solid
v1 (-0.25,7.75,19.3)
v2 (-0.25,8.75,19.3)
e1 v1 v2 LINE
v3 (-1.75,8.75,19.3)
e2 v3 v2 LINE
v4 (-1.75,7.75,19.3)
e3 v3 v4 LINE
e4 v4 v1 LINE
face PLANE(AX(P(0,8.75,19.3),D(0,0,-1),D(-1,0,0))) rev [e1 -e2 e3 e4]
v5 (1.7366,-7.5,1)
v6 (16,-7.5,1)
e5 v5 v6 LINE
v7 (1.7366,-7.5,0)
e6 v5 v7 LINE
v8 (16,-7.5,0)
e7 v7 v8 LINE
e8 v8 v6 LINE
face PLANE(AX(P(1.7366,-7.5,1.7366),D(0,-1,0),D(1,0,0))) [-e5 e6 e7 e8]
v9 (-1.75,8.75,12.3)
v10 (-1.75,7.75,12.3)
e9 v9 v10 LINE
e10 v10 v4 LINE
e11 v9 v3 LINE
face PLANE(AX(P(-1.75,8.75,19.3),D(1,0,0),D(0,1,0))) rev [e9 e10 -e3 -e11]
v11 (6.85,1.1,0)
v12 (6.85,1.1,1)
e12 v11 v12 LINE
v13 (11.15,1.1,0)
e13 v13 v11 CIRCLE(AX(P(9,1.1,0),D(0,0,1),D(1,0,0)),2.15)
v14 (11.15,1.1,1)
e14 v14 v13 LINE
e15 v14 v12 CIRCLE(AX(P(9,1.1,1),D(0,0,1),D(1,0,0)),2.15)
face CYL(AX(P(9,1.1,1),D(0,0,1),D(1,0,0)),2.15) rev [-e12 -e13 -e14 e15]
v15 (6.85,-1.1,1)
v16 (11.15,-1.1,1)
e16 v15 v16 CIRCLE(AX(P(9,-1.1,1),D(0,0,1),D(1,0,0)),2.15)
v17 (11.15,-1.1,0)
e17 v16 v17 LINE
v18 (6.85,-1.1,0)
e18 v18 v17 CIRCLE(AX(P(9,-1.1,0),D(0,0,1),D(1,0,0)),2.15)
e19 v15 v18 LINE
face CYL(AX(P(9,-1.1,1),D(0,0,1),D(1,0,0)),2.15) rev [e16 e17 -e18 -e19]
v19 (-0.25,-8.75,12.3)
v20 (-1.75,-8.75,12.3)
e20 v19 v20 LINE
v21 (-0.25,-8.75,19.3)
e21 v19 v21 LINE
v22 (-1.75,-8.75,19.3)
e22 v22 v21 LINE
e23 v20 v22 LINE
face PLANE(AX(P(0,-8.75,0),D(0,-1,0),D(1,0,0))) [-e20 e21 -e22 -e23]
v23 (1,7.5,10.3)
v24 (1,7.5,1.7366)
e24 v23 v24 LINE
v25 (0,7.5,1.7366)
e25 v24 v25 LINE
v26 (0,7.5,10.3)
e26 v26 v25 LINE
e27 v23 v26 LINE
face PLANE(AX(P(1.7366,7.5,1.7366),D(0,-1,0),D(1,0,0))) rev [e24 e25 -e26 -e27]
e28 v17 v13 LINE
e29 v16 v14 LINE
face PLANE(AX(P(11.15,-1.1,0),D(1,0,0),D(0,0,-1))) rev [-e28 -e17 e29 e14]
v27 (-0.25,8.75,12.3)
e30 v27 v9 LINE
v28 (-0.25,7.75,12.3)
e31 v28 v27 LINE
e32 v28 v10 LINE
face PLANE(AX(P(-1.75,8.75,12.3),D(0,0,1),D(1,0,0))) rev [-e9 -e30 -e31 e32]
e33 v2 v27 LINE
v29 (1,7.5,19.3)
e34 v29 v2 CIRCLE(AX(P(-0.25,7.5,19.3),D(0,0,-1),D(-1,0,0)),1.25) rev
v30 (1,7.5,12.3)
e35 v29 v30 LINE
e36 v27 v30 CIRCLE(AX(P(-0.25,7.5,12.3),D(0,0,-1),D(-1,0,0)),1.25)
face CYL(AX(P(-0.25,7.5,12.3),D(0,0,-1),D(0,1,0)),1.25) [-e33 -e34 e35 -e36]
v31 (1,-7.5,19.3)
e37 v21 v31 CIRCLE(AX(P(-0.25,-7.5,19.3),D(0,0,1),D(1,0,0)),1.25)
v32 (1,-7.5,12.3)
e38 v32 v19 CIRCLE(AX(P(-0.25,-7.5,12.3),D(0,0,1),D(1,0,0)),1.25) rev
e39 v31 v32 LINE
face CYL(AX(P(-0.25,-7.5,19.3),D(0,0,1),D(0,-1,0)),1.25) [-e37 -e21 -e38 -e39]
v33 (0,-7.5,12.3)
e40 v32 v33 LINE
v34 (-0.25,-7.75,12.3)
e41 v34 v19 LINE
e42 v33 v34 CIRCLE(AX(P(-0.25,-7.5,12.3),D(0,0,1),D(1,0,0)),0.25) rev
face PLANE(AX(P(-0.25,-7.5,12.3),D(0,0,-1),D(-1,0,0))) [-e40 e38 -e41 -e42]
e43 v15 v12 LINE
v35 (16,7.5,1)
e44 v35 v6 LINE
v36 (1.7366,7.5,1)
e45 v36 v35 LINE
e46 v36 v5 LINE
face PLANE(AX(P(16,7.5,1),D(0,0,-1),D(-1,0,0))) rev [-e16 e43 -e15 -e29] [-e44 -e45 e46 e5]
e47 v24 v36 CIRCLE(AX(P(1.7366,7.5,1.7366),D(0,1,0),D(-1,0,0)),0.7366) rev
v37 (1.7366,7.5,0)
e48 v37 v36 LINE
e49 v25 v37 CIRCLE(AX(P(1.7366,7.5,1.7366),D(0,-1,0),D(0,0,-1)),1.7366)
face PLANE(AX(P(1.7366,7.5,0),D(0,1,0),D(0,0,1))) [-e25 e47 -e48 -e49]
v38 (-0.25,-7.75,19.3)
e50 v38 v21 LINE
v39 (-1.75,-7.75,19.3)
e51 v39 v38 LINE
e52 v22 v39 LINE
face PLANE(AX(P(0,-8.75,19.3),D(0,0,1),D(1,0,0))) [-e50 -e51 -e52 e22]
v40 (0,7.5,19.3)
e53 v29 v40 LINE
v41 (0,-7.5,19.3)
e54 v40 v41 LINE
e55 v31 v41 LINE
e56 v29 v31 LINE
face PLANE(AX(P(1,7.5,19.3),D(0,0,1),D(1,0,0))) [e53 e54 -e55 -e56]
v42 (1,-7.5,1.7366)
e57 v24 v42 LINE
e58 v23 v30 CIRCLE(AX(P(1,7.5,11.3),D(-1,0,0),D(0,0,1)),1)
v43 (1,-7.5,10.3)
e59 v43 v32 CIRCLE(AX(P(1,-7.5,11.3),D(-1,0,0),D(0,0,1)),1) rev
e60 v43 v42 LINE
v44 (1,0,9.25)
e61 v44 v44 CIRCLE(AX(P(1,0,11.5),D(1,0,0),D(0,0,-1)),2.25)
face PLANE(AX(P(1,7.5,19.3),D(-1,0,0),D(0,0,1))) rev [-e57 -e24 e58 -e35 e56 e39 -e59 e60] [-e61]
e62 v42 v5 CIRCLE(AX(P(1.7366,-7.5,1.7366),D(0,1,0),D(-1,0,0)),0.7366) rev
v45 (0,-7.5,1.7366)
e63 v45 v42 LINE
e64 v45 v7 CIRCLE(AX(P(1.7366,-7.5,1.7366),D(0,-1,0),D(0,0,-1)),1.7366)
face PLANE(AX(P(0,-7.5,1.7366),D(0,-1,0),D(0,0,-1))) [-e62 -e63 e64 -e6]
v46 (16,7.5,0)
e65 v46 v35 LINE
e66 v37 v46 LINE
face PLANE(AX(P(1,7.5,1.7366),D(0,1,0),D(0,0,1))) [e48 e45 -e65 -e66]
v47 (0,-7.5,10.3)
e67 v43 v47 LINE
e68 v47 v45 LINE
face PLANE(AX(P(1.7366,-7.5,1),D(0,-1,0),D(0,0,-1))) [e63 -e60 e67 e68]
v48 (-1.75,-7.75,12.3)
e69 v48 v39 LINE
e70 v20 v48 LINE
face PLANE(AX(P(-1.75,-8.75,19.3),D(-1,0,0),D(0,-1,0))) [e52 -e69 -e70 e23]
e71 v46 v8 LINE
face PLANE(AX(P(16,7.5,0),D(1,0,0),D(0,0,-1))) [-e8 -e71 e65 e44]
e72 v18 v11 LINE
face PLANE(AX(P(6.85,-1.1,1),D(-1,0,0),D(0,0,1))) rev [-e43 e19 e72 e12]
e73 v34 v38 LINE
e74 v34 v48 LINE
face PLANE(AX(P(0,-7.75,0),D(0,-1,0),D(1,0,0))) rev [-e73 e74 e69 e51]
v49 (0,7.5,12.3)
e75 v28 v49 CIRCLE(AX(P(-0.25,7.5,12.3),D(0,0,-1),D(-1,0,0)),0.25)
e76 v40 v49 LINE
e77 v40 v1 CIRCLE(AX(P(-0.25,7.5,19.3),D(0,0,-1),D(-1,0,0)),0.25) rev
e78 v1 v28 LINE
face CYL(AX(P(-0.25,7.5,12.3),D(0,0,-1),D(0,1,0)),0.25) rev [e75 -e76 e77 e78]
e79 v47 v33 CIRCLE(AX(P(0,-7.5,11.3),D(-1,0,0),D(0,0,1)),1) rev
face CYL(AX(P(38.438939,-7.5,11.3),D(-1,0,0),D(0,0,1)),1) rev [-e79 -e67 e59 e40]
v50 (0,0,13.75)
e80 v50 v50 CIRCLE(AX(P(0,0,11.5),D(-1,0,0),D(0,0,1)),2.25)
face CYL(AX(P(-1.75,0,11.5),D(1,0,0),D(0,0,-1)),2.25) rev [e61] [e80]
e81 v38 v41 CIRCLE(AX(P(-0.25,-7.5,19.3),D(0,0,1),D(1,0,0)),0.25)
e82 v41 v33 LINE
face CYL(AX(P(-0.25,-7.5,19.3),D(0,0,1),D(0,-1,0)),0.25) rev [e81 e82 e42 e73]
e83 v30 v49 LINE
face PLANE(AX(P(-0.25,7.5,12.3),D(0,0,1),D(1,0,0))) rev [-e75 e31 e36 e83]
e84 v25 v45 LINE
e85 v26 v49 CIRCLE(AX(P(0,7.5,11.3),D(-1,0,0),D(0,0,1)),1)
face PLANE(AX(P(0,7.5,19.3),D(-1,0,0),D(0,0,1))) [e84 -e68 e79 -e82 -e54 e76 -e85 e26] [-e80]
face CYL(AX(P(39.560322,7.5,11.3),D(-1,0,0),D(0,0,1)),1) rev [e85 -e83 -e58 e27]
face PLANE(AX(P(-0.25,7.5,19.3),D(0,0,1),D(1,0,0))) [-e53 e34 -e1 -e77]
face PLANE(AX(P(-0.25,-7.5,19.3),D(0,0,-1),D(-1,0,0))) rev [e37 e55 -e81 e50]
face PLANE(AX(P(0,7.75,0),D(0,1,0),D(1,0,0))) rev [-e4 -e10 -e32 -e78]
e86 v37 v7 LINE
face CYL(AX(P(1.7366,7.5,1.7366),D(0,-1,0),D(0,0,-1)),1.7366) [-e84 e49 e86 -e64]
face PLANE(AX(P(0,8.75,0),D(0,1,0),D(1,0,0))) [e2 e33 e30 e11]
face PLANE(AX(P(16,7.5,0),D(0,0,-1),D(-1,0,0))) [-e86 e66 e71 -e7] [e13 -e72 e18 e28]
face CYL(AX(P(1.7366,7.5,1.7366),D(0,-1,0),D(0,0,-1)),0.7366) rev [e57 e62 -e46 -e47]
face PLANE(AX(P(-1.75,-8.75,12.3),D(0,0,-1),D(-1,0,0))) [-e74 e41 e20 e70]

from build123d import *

# Parameters (mm, degrees)
BASE_FLANGE_DEPTH        = 7.5
NOTCH_CUT_DEPTH          = 26.568339797
EDGE_FLANGE1_DEPTH       = 7
M4_CLEARANCE_SLOT1_DEPTH = 1
HOLE1_OUTLINE_R          = 2.25
HOLE1_DEPTH              = 1


# Read off the part's stored shape, not the designer's step: M4 Clearance Slot1, Hole1
# Sheet-metal steps are written as plain solids
with BuildPart() as part:
    # Profile Sketch → Base Flange (new, symmetric)
    with BuildSketch(Plane(origin=(171.772586935, 0, 3.13889728), x_dir=(-1, 0, 0), z_dir=(0, 1, 0))):
        with BuildLine():
            Line((155.772586935, -3.13889728), (170.035986935, -3.13889728))
            ThreePointArc((170.035986935, -3.13889728), (171.263948571, -2.630258916), (171.772586935, -1.40229728))
            Line((171.772586935, -1.40229728), (171.772586935, 16.16110272))
            Line((171.772586935, 16.16110272), (170.772586935, 16.16110272))
            Line((170.772586935, 16.16110272), (170.772586935, -1.40229728))
            ThreePointArc((170.772586935, -1.40229728), (170.55684179, -1.923152135), (170.035986935, -2.13889728))
            Line((170.035986935, -2.13889728), (155.772586935, -2.13889728))
            Line((155.772586935, -2.13889728), (155.772586935, -3.13889728))
        make_face()
    extrude(amount=BASE_FLANGE_DEPTH, both=True)

    # Sketch1 → Notch Cut (cut, symmetric)
    with BuildSketch(Plane(origin=(1, 0, 0), x_dir=(0, 0, -1), z_dir=(1, 0, 0))):
        with BuildLine():
            Line((-10.3, -56.296391585), (-10.3, -7.5))
            ThreePointArc((-10.3, -7.5), (-11.3, -6.5), (-12.3, -7.5))
            Line((-12.3, -7.5), (-12.3, -56.296391585))
            Line((-12.3, -56.296391585), (-12.3, -153.889174754))
            Line((-12.3, -153.889174754), (-10.3, -153.889174754))
            Line((-10.3, -153.889174754), (-10.3, -56.296391585))
        make_face()
    notch_cut = extrude(amount=NOTCH_CUT_DEPTH, both=True, mode=Mode.SUBTRACT)

    # Edge-Flange1 section (across the edge) → Edge-Flange1 (add)
    with BuildSketch(Plane(origin=(0, -7.75, 12.3), x_dir=(0, 1, 0), z_dir=(0, 0, 1))):
        with BuildLine():
            Line((-1, 0.25), (-1, 1.75))
            Line((-1, 1.75), (0, 1.75))
            Line((0, 1.75), (0, 0.25))
            ThreePointArc((0, 0.25), (0.073223305, 0.073223305), (0.25, 0))
            Line((0.25, 0), (0.25, -1))
            ThreePointArc((0.25, -1), (-0.633883476, -0.633883476), (-1, 0.25))
        make_face()
    edge_flange1 = extrude(amount=EDGE_FLANGE1_DEPTH)

    # Alignment Tab Mirror: Notch Cut, Edge-Flange1 across plane
    add(notch_cut.mirror(Plane.ZX), mode=Mode.SUBTRACT)
    add(edge_flange1.mirror(Plane.ZX))

    # M4 Clearance Slot1 outline → M4 Clearance Slot1 (cut)
    with BuildSketch(Plane.XY):
        with BuildLine():
            Line((11.15, -1.1), (11.15, 1.1))
            ThreePointArc((11.15, 1.1), (9, 3.25), (6.85, 1.1))
            Line((6.85, 1.1), (6.85, -1.1))
            ThreePointArc((6.85, -1.1), (9, -3.25), (11.15, -1.1))
        make_face()
    extrude(amount=M4_CLEARANCE_SLOT1_DEPTH, mode=Mode.SUBTRACT)

    # Hole1 outline → Hole1 (cut)
    with BuildSketch(Plane.YZ):
        with Locations((0, 11.5)):
            Circle(HOLE1_OUTLINE_R)
    extrude(amount=HOLE1_DEPTH, mode=Mode.SUBTRACT)


solid = part.part
